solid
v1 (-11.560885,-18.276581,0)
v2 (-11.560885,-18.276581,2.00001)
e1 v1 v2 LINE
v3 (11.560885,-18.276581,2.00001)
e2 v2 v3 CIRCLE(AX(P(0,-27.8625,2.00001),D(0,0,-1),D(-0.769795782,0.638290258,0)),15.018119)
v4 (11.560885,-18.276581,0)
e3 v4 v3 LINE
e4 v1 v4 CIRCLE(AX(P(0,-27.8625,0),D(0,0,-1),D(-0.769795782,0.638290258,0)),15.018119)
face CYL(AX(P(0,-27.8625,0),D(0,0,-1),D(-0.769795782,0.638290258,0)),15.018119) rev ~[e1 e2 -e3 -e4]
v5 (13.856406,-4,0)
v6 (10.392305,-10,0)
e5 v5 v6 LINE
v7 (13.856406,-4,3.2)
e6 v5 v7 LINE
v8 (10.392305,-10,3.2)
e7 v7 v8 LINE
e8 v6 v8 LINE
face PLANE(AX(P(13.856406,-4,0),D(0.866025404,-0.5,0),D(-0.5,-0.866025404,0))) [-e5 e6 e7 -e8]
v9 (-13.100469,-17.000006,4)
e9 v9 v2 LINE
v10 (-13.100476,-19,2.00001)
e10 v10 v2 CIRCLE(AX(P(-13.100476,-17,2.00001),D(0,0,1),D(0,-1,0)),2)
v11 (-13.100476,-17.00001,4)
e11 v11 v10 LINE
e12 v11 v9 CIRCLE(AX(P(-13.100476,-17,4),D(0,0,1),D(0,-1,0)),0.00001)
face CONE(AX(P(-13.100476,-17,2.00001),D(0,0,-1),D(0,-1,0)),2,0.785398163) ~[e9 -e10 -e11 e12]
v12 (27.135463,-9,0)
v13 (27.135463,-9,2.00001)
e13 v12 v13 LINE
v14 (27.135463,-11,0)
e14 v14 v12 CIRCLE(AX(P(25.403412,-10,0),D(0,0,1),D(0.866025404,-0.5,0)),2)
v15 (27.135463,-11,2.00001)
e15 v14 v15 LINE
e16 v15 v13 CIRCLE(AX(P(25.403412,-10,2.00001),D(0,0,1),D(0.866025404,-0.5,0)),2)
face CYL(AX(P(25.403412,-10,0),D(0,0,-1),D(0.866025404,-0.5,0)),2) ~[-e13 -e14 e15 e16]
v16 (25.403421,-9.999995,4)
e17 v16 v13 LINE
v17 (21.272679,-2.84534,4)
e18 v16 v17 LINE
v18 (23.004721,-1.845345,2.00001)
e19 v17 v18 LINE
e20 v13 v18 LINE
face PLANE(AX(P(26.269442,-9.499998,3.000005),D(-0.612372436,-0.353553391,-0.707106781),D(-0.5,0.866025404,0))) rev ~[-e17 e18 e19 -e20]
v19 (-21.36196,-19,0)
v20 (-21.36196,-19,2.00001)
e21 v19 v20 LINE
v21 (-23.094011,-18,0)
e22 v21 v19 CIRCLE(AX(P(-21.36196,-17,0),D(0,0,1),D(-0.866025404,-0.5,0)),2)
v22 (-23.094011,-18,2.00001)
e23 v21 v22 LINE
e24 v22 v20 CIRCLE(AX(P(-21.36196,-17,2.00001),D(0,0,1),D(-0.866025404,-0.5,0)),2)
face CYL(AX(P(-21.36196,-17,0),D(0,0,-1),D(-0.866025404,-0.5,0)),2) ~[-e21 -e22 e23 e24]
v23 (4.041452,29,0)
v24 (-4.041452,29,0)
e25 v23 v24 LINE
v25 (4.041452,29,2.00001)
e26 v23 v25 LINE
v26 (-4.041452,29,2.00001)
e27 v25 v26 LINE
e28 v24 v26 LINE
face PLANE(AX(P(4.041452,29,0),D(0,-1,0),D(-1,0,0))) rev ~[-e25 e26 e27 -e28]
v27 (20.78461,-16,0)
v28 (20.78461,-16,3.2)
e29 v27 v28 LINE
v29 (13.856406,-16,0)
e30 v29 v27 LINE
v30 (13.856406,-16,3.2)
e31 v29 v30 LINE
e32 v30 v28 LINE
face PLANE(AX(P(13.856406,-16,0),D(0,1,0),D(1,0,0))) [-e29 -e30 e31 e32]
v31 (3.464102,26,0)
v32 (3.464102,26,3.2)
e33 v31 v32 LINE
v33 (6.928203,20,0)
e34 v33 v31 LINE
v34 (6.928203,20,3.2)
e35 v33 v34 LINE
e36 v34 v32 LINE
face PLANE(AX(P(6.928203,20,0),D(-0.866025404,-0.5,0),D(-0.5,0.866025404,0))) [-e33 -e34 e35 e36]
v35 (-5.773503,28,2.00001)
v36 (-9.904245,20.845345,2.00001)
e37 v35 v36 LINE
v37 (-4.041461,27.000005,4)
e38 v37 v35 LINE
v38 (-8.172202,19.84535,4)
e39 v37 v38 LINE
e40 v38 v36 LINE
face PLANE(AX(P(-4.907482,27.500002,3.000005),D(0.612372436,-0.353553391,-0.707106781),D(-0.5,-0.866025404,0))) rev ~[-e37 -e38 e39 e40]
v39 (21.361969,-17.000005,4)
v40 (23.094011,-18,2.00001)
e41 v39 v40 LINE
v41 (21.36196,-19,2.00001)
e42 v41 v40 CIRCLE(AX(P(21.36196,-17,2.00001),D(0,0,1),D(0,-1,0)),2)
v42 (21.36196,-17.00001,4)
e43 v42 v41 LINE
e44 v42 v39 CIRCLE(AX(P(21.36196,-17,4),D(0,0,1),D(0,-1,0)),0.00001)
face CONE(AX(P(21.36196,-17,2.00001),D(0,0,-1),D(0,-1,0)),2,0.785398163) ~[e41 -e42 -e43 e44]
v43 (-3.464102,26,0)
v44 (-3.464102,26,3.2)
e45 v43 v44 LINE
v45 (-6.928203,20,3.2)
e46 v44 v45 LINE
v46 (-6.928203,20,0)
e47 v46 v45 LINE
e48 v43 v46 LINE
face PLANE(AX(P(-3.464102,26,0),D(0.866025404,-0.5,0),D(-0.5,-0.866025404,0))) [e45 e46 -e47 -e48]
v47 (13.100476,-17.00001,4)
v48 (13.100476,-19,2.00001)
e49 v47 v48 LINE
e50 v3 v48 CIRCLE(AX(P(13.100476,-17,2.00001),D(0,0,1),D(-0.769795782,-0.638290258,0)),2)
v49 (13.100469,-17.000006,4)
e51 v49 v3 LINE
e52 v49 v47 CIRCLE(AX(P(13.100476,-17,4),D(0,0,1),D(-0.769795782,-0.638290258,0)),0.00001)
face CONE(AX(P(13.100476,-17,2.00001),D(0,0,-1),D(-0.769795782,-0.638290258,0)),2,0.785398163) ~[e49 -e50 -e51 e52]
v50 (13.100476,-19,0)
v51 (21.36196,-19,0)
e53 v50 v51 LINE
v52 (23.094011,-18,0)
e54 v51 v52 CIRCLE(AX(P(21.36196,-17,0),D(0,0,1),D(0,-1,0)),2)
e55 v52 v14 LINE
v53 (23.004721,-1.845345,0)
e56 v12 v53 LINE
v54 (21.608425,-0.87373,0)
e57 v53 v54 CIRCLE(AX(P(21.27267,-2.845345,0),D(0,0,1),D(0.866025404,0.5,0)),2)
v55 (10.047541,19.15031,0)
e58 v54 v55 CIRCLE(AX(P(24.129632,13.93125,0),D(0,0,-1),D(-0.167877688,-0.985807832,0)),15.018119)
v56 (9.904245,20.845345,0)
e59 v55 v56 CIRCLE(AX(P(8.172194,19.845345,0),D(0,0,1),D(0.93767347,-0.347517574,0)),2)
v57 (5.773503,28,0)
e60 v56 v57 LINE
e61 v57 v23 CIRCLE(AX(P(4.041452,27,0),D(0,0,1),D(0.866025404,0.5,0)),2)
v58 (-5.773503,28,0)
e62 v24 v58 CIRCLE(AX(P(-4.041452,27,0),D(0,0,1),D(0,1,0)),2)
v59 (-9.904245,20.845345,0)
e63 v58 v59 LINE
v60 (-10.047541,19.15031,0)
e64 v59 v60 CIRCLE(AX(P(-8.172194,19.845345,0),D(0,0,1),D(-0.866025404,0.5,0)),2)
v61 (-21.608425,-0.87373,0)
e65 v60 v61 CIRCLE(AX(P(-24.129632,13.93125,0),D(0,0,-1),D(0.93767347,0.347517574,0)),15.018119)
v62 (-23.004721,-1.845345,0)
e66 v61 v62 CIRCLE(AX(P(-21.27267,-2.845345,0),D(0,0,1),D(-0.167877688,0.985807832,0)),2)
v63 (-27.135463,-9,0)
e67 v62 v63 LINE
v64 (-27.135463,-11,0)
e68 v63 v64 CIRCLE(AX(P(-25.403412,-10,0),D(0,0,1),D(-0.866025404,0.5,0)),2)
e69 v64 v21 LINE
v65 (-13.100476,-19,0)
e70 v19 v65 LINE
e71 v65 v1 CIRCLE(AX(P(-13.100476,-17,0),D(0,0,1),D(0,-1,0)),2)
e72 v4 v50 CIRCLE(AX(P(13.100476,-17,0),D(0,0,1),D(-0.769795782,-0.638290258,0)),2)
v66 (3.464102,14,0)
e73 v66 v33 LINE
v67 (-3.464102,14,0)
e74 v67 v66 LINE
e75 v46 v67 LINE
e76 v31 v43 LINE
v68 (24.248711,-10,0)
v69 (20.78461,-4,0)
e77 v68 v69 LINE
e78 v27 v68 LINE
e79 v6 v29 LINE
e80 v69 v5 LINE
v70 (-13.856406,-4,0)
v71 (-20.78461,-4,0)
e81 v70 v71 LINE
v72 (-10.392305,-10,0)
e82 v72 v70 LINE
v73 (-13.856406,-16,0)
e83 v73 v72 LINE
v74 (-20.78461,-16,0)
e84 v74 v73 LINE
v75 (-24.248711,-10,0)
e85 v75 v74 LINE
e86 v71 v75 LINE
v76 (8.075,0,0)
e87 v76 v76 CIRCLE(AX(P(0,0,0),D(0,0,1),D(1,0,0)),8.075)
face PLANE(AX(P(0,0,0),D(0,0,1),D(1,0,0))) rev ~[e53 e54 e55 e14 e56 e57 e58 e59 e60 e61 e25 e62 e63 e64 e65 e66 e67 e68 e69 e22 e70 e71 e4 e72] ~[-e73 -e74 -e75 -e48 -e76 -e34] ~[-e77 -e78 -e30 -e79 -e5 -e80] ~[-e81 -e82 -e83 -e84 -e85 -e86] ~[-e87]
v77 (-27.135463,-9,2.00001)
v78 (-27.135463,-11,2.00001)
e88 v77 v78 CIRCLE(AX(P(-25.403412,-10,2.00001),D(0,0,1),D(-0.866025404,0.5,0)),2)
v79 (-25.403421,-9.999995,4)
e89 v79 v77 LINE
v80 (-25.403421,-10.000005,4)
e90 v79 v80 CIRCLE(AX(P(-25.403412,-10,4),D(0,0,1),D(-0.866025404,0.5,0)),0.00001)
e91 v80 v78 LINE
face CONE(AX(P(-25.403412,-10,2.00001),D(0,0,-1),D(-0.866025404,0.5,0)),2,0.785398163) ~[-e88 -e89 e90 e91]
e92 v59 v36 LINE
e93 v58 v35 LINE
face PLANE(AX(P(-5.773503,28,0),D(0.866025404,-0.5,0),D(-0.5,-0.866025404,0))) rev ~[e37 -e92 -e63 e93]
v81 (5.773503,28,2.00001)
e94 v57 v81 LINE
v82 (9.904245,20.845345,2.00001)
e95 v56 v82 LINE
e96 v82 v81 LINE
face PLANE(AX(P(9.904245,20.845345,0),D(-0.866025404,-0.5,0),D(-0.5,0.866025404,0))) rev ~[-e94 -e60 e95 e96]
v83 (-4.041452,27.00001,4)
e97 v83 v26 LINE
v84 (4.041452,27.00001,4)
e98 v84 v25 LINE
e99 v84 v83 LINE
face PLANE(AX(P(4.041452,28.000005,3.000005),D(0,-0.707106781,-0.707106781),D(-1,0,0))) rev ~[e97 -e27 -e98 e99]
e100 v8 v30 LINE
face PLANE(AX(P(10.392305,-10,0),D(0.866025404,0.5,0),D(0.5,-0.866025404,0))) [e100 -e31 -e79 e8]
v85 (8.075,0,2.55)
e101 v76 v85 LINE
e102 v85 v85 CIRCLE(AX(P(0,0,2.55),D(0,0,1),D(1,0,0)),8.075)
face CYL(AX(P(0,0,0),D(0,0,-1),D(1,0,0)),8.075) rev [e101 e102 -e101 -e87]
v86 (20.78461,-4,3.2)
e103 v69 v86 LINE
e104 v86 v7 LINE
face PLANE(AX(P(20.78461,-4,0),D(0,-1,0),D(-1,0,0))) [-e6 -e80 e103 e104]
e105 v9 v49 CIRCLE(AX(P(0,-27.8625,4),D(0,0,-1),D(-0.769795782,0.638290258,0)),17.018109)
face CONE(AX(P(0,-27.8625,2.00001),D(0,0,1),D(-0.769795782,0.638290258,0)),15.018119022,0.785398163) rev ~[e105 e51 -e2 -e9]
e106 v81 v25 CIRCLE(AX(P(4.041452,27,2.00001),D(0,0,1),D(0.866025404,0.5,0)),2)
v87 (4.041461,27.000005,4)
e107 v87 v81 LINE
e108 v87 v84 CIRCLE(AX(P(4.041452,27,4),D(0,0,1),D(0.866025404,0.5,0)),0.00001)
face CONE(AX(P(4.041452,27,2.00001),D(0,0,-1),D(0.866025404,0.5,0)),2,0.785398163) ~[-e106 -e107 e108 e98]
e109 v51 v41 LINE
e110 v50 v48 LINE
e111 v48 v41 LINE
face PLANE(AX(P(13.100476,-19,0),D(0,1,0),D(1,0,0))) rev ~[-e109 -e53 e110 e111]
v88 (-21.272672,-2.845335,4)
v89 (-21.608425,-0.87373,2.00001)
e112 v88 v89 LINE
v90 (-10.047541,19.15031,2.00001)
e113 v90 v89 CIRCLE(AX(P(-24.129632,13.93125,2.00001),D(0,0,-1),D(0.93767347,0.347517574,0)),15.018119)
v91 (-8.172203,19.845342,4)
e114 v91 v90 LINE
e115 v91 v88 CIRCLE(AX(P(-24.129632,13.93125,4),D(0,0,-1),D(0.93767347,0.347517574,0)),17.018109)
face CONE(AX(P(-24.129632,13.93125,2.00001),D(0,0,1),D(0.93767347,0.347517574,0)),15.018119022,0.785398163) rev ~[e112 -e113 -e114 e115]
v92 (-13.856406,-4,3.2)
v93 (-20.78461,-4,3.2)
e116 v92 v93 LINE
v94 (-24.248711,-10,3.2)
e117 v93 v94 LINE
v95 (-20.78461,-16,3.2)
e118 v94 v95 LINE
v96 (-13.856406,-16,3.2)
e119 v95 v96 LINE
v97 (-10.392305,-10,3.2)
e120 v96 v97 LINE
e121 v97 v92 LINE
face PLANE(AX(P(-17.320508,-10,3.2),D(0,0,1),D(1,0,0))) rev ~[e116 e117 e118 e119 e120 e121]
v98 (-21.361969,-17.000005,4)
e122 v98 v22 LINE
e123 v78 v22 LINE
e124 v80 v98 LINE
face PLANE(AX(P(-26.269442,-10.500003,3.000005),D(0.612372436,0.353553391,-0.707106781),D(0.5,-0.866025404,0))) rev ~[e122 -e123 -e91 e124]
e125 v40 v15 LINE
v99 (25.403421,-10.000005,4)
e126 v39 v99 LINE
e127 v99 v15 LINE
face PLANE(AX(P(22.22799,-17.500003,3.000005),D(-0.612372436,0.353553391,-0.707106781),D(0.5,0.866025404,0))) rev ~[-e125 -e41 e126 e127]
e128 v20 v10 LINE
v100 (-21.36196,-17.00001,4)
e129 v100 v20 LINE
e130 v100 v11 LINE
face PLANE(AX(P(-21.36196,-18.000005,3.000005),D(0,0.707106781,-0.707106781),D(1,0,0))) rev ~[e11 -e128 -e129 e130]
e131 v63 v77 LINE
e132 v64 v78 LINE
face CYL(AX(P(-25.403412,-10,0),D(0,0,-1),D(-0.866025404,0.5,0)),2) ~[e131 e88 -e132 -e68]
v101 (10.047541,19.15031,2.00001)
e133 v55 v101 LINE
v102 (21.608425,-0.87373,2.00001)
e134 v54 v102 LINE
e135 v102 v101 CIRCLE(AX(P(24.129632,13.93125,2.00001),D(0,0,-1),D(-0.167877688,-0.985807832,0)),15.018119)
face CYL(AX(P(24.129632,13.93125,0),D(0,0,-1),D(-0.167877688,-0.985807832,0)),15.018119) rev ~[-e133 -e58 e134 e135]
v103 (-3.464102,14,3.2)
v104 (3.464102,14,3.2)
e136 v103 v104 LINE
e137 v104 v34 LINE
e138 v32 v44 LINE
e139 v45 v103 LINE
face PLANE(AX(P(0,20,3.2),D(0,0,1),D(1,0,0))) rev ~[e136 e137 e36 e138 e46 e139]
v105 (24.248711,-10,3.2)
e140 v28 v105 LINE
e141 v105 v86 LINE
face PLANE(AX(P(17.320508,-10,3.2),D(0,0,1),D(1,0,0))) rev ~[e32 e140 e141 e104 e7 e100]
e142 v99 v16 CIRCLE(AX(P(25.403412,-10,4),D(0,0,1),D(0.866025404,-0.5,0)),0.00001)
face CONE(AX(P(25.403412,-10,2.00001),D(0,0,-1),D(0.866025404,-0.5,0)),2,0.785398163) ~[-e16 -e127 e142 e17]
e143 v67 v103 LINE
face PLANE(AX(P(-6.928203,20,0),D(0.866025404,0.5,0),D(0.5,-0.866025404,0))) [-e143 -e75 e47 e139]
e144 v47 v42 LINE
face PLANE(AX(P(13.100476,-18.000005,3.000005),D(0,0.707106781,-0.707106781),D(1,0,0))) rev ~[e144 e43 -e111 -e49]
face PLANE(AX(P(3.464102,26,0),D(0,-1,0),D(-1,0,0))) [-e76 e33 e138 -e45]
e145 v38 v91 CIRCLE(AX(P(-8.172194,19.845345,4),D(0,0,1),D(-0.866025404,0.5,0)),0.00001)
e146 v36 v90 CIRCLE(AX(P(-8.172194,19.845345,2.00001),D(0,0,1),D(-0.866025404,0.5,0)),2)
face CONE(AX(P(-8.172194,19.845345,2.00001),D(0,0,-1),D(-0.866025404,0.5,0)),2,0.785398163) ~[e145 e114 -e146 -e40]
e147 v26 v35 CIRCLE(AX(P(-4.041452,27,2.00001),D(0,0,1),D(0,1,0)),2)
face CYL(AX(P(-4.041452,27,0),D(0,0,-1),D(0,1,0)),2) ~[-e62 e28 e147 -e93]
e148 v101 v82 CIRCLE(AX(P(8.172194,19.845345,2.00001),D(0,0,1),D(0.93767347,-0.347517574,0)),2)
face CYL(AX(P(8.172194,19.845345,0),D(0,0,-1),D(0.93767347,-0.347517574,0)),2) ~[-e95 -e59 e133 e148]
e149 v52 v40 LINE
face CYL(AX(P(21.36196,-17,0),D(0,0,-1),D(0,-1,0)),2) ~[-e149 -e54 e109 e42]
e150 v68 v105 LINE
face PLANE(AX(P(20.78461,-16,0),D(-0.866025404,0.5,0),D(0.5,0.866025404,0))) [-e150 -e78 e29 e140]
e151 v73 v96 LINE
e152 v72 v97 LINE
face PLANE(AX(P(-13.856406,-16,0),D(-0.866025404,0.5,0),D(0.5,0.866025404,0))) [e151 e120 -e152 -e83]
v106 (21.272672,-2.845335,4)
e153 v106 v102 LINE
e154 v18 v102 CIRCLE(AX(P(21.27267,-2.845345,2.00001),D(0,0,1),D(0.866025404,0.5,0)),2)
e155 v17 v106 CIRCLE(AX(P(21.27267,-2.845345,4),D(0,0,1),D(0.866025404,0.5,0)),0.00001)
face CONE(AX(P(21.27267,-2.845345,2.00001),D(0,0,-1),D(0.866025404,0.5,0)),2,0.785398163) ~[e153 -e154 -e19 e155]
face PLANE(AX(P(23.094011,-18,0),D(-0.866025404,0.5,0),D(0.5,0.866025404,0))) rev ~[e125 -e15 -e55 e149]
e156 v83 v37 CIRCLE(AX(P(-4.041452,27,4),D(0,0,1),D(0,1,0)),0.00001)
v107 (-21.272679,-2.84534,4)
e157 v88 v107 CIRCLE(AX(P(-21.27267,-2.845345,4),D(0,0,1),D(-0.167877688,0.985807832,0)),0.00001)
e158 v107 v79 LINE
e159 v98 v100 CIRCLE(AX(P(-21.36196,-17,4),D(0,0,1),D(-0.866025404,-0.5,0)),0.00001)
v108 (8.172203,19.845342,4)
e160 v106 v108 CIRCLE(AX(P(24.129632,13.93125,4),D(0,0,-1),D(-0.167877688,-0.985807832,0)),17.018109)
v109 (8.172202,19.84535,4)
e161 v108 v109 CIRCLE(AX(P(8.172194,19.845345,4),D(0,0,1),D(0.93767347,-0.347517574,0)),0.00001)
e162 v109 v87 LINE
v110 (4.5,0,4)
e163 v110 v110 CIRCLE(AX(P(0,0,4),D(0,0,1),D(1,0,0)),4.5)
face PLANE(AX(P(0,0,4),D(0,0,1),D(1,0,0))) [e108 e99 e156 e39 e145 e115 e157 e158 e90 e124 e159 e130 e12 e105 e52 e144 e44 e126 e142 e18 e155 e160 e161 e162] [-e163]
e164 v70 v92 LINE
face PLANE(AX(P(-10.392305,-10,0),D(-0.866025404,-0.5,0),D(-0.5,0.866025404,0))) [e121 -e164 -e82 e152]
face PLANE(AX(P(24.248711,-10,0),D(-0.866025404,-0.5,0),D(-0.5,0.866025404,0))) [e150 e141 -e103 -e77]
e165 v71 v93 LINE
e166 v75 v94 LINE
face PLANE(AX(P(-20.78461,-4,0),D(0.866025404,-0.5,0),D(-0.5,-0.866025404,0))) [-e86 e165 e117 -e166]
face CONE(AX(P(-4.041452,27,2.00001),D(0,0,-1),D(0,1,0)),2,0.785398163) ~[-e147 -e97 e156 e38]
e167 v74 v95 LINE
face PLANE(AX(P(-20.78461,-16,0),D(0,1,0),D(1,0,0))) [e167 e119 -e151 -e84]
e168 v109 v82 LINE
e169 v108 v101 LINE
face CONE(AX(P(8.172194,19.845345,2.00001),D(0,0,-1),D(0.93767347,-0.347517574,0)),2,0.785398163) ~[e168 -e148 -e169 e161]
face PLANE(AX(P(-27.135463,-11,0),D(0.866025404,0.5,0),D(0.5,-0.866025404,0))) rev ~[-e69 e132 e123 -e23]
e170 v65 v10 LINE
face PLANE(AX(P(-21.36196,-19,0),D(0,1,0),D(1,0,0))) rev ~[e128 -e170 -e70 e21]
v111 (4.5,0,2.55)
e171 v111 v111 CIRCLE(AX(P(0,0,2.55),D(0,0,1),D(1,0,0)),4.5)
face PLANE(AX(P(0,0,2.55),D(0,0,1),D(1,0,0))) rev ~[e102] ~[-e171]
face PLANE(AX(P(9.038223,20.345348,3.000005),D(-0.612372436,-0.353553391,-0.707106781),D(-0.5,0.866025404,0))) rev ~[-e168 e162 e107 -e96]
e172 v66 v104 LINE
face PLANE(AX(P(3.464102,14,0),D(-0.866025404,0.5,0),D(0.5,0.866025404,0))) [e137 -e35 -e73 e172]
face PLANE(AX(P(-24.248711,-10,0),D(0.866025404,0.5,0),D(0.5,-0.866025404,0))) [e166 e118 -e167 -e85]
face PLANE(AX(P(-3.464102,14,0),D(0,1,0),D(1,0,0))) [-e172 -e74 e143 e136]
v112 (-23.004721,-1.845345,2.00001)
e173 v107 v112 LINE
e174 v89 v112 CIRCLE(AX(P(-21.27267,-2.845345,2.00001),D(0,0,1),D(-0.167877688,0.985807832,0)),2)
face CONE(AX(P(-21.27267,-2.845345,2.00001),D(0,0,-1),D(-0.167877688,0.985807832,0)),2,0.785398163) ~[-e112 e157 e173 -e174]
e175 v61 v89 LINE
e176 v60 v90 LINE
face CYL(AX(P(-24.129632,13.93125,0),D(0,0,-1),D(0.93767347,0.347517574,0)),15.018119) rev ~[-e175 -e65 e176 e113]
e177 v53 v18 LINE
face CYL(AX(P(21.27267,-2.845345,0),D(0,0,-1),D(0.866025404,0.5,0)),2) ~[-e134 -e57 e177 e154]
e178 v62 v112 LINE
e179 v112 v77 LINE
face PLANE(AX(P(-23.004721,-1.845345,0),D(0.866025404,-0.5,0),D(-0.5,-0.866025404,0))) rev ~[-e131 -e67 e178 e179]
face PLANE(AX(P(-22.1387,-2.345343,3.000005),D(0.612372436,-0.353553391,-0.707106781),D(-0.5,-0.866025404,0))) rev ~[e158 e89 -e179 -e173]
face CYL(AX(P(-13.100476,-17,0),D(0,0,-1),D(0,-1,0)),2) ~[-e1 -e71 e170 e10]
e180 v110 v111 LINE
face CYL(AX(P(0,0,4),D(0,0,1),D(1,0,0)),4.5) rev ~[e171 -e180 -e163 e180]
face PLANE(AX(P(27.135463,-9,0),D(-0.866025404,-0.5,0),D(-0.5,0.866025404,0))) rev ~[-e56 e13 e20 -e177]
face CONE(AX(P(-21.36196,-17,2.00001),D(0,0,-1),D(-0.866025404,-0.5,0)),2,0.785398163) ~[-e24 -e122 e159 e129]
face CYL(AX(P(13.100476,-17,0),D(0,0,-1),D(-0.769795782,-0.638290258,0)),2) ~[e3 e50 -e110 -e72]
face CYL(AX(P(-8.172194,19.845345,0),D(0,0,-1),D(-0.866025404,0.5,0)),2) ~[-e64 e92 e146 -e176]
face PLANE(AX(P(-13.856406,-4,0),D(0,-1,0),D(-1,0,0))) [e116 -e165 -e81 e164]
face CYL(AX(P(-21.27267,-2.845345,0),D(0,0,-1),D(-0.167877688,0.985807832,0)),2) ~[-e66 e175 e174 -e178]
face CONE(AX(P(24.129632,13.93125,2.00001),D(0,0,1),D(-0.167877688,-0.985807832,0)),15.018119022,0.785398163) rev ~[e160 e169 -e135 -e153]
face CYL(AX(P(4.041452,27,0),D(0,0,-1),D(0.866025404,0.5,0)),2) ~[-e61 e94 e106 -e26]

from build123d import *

# Parameters (mm, degrees)
F1_DEPTH = 4
F2_R     = 8.075
F3_DEPTH = 2.55
F5_DEPTH = 3.2
F6_SIZE  = 1.99999
F7_R     = 4.5
F8_DEPTH = 25


# Not quite as in the source:
# - a fillet or chamfer is up to 0.001 mm smaller than in the source, because OpenCascade refuses the exact size


with BuildPart() as f1:
    # F0 (on Top) → F1 (new body)
    with BuildSketch(Plane.XY):
        with BuildLine():
            Line((-5.7735026919, 28), (-9.9042445516, 20.8453452261))
            ThreePointArc((-9.9042445516, 20.8453452261), (-10.1650850266, 20.0138217399), (-10.0475406836, 19.1503100787))
            ThreePointArc((-10.0475406836, 19.1503100787), (-11.1235598668, 6.4221902835), (-21.6084253603, -0.8737295618))
            ThreePointArc((-21.6084253603, -0.8737295618), (-22.4150205669, -1.2036890053), (-23.0047207922, -1.8453452261))
            Line((-23.0047207922, -1.8453452261), (-27.1354626519, -9))
            ThreePointArc((-27.1354626519, -9), (-27.4034118443, -10), (-27.1354626519, -11))
            Line((-27.1354626519, -11), (-23.0940107676, -18))
            ThreePointArc((-23.0940107676, -18), (-22.36195996, -18.7320508076), (-21.36195996, -19))
            Line((-21.36195996, -19), (-13.1004762407, -19))
            ThreePointArc((-13.1004762407, -19), (-12.2499355402, -18.8101327346), (-11.5608846767, -18.2765805169))
            ThreePointArc((-11.5608846767, -18.2765805169), (0, -12.8443805669), (11.5608846767, -18.2765805169))
            ThreePointArc((11.5608846767, -18.2765805169), (12.2499355402, -18.8101327346), (13.1004762407, -19))
            Line((13.1004762407, -19), (21.36195996, -19))
            ThreePointArc((21.36195996, -19), (22.36195996, -18.7320508076), (23.0940107676, -18))
            Line((23.0940107676, -18), (27.1354626519, -11))
            ThreePointArc((27.1354626519, -11), (27.4034118443, -10), (27.1354626519, -9))
            Line((27.1354626519, -9), (23.0047207922, -1.8453452261))
            ThreePointArc((23.0047207922, -1.8453452261), (22.4150205669, -1.2036890053), (21.6084253603, -0.8737295618))
            ThreePointArc((21.6084253603, -0.8737295618), (11.1235598668, 6.4221902835), (10.0475406836, 19.1503100787))
            ThreePointArc((10.0475406836, 19.1503100787), (10.1650850266, 20.0138217399), (9.9042445516, 20.8453452261))
            Line((9.9042445516, 20.8453452261), (5.7735026919, 28))
            ThreePointArc((5.7735026919, 28), (5.0414518843, 28.7320508076), (4.0414518843, 29))
            Line((4.0414518843, 29), (-4.0414518843, 29))
            ThreePointArc((-4.0414518843, 29), (-5.0414518843, 28.7320508076), (-5.7735026919, 28))
        make_face()
    extrude(amount=F1_DEPTH)

    # F2 (on face) → F3 (cut)
    with BuildSketch(Plane.XY):
        Circle(F2_R)
    extrude(amount=F3_DEPTH, mode=Mode.SUBTRACT)

    # F4 (on face) → F5 (cut)
    with BuildSketch(Plane.XY):
        Polygon((6.9282032303, 20), (3.4641016151, 26), (-3.4641016151, 26), (-6.9282032303, 20), (-3.4641016151, 14), (3.4641016151, 14), align=None)
        Polygon((-13.8564064606, -16), (-10.3923048454, -10), (-13.8564064606, -4), (-20.7846096908, -4), (-24.248711306, -10), (-20.7846096908, -16), align=None)
        Polygon((20.7846096908, -4), (13.8564064606, -4), (10.3923048454, -10), (13.8564064606, -16), (20.7846096908, -16), (24.248711306, -10), align=None)
    extrude(amount=F5_DEPTH, mode=Mode.SUBTRACT)

    # F6 (size 2 in the source; OpenCascade refuses exactly that, so slightly less here)
    f6_edges = [f1.edges().sort_by_distance(p)[0] for p in [
        (10.165085, 20.013822, 4),
        (7.838874, 24.422673, 4),
        (5.041452, 28.732051, 4),
        (0, 29, 4),
        (-5.041452, 28.732051, 4),
        (-7.838874, 24.422673, 4),
        (-10.165085, 20.013822, 4),
        (-11.12356, 6.42219, 4),
        (-22.415021, -1.203689, 4),
        (-25.070092, -5.422673, 4),
        (-27.403412, -10, 4),
        (-25.114737, -14.5, 4),
        (-22.36196, -18.732051, 4),
        (-17.231218, -19, 4),
        (-12.249936, -18.810133, 4),
        (0, -12.844381, 4),
        (12.249936, -18.810133, 4),
        (17.231218, -19, 4),
        (22.36196, -18.732051, 4),
        (25.114737, -14.5, 4),
        (27.403412, -10, 4),
        (25.070092, -5.422673, 4),
        (22.415021, -1.203689, 4),
        (11.12356, 6.42219, 4),
    ]]
    chamfer(f6_edges, length=F6_SIZE)

    # F7 (on face) → F8 (cut)
    with BuildSketch(Plane.XY.offset(4)):
        Circle(F7_R)
    extrude(amount=-F8_DEPTH, mode=Mode.SUBTRACT)


solid = f1.part
